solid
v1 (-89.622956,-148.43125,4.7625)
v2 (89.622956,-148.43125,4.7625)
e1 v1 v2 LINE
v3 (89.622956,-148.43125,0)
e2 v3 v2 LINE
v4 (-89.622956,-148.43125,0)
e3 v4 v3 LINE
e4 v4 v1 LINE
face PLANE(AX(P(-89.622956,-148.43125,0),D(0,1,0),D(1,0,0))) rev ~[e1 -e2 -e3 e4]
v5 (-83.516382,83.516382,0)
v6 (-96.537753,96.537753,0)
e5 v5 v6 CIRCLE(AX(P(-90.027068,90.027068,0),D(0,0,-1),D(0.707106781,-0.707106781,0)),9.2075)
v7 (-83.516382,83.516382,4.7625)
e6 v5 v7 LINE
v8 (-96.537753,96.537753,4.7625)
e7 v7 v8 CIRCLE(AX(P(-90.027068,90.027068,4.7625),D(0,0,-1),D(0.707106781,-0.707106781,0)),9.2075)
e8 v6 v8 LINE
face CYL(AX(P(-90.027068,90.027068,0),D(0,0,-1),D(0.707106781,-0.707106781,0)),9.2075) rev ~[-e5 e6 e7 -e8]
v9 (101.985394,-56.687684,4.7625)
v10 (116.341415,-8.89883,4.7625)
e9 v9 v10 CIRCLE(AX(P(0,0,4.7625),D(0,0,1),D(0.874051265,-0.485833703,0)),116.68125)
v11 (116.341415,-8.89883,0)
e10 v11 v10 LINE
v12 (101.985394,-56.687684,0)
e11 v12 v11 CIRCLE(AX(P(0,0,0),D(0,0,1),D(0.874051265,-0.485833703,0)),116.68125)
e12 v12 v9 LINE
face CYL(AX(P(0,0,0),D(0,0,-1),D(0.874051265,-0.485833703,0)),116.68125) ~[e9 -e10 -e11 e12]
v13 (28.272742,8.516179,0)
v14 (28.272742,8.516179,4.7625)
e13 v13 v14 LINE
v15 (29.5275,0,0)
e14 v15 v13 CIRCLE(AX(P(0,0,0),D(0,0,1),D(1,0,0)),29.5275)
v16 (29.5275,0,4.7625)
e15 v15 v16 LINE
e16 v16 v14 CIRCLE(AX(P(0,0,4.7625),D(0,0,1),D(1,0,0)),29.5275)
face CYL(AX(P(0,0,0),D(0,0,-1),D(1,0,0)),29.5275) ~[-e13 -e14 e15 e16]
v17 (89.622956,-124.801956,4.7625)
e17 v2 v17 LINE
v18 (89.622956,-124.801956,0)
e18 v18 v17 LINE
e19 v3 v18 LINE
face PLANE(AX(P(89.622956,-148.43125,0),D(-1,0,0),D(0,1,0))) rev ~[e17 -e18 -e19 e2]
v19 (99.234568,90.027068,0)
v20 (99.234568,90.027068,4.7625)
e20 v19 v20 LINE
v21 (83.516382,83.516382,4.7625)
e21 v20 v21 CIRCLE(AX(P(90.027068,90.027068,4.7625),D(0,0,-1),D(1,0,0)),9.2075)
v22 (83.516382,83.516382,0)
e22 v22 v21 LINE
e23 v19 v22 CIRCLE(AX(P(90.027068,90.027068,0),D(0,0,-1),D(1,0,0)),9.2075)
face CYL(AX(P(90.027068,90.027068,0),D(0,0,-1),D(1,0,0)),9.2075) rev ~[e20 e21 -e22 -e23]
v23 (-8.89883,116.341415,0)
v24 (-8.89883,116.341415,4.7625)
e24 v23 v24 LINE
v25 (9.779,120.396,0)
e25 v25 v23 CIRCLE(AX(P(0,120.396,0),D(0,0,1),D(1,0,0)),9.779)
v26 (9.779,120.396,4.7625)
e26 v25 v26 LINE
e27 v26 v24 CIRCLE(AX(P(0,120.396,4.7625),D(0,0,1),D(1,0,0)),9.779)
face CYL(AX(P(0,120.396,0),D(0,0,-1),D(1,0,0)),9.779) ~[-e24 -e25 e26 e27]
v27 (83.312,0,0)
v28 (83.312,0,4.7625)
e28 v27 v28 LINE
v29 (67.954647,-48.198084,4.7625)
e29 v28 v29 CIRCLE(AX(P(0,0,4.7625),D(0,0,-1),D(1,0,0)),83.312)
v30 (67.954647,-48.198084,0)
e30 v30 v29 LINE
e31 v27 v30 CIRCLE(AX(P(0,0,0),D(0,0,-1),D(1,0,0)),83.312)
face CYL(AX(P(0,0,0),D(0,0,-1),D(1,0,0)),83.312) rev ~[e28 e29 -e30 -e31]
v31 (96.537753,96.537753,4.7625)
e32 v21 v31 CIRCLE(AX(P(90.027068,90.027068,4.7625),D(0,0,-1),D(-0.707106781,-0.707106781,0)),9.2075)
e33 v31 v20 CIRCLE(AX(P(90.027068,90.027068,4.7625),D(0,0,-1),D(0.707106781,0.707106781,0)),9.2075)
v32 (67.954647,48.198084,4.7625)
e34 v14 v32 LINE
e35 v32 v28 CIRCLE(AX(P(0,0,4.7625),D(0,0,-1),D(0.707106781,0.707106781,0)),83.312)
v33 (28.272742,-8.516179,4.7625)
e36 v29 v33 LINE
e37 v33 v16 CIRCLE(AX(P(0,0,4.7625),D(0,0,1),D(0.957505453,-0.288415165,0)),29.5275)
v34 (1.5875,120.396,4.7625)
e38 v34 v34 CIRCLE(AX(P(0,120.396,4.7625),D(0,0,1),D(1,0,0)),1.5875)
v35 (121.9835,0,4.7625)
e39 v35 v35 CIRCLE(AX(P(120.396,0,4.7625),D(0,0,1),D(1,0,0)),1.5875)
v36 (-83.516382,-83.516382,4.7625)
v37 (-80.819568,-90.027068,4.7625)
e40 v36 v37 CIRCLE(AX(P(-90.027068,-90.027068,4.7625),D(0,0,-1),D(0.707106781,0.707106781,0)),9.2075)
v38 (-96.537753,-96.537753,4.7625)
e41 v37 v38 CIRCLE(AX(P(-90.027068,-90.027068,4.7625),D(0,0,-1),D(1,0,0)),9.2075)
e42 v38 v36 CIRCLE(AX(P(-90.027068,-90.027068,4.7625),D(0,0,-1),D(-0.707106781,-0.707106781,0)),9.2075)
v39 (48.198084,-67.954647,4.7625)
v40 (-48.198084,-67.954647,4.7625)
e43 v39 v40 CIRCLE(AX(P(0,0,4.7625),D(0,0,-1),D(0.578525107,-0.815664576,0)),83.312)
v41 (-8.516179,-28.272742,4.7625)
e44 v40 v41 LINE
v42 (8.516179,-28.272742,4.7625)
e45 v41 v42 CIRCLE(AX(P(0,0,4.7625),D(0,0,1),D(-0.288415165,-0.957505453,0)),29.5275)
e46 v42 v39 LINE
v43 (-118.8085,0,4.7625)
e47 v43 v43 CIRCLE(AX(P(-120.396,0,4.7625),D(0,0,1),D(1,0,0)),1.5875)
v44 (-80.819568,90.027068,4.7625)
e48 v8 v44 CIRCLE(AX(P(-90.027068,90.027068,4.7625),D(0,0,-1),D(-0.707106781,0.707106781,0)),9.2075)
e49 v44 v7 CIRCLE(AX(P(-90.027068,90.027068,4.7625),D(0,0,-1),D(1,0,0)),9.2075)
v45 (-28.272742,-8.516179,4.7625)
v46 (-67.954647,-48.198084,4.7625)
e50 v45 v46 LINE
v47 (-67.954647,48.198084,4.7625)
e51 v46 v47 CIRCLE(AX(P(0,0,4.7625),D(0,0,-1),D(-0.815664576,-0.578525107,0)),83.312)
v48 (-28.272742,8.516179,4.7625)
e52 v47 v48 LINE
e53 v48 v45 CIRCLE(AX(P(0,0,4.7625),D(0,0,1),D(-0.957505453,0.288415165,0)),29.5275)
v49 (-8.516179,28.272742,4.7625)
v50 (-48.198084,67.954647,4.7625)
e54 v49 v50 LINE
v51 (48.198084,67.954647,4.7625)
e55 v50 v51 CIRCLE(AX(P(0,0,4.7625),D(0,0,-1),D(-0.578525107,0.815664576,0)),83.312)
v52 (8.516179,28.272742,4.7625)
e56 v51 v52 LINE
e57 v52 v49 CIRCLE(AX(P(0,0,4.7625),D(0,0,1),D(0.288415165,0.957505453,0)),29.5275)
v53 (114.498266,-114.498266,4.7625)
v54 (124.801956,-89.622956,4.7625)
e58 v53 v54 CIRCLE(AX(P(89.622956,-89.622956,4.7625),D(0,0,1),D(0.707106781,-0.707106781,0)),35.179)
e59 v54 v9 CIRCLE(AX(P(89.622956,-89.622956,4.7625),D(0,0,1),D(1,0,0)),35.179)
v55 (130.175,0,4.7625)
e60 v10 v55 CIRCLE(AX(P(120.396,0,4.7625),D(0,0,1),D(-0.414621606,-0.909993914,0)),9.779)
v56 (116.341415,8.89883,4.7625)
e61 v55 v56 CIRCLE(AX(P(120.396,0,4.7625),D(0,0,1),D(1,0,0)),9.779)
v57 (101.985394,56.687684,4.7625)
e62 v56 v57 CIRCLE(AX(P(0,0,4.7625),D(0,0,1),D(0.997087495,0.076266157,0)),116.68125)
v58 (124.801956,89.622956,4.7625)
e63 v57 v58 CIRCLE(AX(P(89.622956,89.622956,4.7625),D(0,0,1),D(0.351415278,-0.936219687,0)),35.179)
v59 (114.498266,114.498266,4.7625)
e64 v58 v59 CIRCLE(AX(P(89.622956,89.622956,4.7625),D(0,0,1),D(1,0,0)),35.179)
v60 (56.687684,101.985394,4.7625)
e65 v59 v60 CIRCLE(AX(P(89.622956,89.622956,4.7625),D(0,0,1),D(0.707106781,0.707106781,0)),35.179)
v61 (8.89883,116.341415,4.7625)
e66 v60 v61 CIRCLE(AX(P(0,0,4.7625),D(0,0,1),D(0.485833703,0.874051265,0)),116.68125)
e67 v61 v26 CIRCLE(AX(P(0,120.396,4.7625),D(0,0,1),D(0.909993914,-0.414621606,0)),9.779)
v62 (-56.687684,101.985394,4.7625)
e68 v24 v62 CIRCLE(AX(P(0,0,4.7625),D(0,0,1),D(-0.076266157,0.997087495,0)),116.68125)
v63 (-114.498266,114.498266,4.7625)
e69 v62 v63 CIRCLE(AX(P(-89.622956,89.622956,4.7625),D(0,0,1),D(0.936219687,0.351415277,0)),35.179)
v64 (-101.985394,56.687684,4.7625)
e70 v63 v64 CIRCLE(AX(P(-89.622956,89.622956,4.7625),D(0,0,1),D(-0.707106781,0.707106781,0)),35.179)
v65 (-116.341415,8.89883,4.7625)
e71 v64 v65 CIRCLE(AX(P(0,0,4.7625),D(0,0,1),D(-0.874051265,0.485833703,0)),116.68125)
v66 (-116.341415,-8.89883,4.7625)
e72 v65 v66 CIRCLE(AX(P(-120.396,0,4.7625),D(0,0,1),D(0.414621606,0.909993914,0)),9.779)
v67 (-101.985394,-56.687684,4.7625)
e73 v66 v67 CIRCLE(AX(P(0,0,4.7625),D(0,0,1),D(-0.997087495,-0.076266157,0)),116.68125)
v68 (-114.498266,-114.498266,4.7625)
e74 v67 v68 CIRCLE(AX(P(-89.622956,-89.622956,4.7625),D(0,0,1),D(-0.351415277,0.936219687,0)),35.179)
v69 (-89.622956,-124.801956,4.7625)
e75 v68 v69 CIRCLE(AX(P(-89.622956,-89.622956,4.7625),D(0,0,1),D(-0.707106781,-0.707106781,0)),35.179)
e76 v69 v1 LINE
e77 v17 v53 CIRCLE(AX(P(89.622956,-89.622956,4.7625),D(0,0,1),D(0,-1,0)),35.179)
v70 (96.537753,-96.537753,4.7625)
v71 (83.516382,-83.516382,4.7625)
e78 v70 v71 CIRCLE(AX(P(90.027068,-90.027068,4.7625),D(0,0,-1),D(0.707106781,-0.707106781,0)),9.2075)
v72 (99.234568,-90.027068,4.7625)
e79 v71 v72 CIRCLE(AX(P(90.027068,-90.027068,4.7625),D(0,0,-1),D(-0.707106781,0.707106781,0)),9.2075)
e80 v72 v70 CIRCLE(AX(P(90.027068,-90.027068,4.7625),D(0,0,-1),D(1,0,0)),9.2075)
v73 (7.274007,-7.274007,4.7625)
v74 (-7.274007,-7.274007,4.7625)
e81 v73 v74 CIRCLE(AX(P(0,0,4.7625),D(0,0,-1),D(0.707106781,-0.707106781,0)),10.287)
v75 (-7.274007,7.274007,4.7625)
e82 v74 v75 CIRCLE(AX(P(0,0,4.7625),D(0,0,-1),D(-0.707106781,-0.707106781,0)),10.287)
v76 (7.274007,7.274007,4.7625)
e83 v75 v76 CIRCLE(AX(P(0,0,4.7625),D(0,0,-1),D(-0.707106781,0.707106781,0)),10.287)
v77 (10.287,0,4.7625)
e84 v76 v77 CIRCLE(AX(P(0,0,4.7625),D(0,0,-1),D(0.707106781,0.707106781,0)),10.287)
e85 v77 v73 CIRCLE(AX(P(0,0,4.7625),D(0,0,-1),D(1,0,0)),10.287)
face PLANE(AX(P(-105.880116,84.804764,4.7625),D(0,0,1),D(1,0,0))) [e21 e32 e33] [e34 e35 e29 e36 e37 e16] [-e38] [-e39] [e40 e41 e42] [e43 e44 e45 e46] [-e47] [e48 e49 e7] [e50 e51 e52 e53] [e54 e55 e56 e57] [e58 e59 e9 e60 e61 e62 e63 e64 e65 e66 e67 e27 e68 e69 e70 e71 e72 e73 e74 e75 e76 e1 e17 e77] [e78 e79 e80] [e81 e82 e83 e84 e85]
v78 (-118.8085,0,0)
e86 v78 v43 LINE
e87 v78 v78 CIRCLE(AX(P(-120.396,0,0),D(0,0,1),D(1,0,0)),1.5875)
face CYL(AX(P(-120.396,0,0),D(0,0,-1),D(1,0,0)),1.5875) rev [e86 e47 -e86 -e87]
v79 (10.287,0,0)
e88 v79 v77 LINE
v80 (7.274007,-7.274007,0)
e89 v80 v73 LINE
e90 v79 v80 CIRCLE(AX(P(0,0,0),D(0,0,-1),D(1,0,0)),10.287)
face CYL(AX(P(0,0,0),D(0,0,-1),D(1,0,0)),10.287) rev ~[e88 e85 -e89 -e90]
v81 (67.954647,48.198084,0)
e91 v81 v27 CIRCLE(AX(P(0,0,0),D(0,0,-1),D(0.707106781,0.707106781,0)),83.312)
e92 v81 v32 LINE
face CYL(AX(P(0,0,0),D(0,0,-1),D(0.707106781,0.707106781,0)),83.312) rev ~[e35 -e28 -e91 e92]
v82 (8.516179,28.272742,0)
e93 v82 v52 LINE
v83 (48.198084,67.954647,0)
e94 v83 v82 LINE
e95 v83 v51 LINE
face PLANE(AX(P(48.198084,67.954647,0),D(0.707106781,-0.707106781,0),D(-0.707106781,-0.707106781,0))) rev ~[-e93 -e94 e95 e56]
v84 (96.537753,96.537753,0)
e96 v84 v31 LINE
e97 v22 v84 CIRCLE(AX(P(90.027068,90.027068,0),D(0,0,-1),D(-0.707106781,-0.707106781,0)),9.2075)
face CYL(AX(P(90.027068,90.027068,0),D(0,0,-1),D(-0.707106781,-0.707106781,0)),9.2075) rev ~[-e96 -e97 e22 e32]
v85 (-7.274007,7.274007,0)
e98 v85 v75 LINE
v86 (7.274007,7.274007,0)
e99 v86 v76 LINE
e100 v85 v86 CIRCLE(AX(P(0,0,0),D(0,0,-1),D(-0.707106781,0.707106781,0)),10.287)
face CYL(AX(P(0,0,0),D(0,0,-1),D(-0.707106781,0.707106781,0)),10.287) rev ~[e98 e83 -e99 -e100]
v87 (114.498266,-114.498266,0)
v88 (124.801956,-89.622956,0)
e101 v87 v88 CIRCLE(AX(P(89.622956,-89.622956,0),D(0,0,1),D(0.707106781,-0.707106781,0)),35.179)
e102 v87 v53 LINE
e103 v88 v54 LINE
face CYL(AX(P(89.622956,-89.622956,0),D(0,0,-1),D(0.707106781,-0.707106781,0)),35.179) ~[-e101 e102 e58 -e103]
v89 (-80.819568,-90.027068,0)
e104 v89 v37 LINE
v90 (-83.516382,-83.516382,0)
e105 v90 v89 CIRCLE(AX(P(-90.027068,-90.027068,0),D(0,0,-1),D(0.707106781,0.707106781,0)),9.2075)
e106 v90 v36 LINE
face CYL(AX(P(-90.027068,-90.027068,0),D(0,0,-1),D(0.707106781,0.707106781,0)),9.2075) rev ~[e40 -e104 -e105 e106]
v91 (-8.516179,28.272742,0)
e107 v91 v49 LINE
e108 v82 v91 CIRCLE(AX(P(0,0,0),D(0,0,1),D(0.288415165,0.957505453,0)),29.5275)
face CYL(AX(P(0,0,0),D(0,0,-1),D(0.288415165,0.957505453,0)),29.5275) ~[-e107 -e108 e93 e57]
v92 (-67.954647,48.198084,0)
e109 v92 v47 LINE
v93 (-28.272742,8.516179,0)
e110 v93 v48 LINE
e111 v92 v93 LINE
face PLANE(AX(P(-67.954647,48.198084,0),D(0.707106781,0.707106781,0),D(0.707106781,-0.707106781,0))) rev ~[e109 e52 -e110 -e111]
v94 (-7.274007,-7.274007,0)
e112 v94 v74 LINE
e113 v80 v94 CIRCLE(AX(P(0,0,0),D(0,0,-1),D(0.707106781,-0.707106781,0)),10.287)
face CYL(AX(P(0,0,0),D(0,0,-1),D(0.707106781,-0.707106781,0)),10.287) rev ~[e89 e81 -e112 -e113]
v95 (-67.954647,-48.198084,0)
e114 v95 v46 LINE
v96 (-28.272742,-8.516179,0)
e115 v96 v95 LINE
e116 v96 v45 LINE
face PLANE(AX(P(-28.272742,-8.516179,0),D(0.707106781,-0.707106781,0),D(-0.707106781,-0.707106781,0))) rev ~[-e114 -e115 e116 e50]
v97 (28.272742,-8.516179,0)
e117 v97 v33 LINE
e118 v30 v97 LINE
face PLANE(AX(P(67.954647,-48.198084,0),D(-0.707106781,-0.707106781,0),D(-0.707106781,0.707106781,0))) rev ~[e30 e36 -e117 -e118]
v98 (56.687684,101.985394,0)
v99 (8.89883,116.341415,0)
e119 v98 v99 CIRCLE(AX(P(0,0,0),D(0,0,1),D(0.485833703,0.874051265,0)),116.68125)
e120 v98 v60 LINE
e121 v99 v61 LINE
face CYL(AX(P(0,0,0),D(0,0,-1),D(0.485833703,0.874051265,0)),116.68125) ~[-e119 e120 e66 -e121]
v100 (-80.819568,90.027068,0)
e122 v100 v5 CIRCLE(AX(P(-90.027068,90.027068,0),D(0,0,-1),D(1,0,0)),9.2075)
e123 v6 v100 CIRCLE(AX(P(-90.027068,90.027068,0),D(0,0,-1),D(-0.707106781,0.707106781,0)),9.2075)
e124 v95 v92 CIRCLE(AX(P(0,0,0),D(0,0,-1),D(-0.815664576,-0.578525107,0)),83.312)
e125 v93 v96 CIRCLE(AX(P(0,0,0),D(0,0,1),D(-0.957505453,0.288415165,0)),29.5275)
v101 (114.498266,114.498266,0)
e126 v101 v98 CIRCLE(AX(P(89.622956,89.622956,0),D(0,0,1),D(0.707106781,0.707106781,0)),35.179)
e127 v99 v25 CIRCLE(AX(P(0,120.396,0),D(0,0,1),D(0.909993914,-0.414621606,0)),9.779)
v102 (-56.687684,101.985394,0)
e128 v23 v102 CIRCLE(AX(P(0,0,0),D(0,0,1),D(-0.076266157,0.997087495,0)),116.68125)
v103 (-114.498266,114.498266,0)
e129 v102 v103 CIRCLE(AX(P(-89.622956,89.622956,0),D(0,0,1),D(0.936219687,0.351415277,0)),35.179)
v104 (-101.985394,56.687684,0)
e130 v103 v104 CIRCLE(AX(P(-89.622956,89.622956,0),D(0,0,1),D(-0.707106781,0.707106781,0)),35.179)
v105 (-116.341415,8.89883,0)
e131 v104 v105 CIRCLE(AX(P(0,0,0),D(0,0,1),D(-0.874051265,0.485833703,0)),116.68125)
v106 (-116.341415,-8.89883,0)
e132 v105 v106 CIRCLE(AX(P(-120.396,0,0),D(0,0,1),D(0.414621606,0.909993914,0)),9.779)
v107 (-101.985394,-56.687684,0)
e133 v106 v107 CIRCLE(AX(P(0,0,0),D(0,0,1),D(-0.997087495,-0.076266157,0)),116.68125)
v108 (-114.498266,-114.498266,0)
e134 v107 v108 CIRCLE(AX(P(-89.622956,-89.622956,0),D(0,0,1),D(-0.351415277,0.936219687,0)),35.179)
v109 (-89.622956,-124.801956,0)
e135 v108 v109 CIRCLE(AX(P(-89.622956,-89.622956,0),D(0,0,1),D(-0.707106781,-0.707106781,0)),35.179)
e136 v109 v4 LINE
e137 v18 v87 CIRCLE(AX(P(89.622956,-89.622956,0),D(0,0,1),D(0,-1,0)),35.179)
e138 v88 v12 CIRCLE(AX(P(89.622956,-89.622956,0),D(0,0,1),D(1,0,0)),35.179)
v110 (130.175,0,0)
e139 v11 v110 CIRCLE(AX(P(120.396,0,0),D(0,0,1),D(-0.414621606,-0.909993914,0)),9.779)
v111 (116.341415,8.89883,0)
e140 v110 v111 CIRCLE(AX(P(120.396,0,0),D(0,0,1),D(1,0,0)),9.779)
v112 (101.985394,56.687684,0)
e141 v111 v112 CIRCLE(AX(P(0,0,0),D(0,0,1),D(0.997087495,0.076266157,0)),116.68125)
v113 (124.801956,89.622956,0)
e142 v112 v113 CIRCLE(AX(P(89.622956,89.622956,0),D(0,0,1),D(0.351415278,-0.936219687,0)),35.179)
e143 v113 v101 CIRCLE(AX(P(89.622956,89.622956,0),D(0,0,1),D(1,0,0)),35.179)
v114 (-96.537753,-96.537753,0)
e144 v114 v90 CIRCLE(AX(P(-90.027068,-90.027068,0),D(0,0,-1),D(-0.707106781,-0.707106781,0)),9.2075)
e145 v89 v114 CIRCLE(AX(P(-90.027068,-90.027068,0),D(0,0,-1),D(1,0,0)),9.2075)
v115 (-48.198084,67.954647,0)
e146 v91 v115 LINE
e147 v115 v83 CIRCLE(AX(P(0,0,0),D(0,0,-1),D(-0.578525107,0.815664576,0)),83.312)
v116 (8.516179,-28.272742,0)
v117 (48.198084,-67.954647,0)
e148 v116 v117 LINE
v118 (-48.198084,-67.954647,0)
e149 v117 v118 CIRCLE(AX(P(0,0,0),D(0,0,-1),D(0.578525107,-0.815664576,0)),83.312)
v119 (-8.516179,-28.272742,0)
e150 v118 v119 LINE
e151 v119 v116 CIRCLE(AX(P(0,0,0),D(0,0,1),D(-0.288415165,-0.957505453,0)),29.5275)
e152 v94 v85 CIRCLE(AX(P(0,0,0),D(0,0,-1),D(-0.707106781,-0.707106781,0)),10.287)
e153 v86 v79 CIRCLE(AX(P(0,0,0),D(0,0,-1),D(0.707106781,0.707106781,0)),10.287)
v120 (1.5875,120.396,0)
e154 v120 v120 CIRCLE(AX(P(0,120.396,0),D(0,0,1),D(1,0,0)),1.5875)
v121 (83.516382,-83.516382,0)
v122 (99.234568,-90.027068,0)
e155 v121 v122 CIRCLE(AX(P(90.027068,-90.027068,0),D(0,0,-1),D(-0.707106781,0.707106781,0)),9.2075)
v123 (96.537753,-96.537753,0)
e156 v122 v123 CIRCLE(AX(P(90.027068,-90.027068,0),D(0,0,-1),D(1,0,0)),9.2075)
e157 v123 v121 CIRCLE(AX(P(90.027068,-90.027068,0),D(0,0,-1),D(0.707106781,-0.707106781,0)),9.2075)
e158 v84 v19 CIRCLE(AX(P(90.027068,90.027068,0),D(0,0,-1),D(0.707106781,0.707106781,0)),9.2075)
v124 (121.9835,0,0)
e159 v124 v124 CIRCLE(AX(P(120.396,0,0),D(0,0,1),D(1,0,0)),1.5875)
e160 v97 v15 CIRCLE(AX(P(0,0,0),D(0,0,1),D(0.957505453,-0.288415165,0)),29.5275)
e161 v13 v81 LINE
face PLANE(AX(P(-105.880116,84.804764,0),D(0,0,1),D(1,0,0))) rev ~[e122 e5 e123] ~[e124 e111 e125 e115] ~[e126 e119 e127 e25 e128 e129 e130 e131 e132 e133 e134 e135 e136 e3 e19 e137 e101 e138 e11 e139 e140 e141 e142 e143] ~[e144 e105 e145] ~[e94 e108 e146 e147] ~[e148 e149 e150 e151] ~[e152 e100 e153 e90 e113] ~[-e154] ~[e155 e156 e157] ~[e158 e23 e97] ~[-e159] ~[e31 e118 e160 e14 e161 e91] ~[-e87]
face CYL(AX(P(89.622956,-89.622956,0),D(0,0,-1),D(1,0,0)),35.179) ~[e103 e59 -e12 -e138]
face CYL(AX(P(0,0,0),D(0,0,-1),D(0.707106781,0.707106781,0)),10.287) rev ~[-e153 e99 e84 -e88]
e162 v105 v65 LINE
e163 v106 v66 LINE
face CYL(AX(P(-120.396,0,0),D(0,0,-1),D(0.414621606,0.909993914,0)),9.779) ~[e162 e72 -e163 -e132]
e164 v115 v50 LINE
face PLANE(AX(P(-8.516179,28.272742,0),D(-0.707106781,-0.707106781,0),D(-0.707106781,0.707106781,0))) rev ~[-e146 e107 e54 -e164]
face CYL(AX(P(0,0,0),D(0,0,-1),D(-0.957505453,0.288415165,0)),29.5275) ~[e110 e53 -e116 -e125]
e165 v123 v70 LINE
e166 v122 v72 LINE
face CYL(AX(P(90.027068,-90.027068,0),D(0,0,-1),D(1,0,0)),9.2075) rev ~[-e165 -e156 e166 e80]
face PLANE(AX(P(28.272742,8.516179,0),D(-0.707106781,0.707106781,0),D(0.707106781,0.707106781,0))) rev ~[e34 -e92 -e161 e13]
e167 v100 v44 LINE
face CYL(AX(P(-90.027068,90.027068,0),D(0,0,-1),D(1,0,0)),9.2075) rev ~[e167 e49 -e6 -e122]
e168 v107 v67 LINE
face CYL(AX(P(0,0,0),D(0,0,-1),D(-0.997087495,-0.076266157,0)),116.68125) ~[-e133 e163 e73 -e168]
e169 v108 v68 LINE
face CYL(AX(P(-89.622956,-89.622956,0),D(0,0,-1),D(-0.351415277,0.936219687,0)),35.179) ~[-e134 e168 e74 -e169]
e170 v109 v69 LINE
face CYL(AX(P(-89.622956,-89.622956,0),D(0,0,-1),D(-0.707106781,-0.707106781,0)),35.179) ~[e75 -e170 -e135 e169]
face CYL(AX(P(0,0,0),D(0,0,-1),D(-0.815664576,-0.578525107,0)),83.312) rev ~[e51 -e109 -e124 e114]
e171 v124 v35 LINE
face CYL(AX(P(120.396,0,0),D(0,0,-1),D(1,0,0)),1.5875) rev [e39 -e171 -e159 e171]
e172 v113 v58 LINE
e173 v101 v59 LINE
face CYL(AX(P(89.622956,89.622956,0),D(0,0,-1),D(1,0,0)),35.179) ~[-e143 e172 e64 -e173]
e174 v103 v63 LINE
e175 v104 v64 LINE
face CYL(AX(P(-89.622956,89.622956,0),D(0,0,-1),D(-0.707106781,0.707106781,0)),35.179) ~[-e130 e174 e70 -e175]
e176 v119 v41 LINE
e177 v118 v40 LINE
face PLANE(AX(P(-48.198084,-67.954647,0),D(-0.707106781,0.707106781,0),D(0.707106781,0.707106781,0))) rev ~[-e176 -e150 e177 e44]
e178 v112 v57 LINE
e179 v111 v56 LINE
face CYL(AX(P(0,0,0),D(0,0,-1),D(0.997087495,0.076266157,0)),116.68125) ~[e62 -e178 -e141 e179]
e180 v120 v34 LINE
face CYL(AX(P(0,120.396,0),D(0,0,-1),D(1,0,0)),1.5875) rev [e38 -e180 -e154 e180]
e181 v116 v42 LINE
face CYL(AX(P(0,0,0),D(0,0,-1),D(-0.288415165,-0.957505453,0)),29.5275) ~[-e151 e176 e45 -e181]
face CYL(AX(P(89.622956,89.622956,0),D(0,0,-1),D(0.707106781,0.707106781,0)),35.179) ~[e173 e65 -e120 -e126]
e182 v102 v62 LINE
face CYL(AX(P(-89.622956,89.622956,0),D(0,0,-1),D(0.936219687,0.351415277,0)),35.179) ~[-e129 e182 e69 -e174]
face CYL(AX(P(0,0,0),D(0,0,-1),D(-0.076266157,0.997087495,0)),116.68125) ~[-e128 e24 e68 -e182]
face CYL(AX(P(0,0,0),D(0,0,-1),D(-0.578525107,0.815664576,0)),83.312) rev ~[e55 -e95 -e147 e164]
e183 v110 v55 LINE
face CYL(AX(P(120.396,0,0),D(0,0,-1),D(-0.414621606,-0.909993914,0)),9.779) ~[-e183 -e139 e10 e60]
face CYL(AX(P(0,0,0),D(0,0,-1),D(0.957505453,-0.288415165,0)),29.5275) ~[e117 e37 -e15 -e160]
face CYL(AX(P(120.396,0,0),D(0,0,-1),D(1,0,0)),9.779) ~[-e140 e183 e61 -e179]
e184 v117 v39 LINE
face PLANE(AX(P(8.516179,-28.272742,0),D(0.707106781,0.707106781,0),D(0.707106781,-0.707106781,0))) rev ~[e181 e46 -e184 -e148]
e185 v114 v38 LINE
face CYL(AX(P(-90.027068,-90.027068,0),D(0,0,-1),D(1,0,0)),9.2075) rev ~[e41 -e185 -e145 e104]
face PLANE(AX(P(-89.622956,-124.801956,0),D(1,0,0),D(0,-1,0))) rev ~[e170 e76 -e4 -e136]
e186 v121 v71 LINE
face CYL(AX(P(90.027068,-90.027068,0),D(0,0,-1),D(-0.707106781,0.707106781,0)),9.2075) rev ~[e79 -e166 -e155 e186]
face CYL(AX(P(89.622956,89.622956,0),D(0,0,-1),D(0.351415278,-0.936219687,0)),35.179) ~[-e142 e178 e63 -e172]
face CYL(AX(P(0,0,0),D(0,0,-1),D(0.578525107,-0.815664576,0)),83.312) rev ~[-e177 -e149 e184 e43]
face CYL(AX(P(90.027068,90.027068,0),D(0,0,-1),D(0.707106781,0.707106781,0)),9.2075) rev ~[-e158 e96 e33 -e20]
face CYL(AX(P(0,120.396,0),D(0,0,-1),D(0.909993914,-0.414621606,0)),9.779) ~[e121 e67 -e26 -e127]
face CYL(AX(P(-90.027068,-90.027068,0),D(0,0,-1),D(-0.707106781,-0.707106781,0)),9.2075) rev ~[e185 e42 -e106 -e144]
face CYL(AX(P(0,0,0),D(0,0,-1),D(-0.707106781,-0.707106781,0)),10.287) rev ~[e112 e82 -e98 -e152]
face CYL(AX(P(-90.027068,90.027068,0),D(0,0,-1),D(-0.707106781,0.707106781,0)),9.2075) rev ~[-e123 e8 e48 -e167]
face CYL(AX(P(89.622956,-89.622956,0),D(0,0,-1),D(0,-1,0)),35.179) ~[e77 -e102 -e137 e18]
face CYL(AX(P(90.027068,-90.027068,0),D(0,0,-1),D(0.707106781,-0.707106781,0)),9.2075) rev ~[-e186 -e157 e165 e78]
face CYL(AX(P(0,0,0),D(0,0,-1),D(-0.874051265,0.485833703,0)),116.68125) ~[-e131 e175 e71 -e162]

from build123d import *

# Parameters (mm, degrees)
F0_R     = 1.5875
F1_DEPTH = 4.7625


# Not quite as in the source:
# - a length typed as a fraction of an inch, garbled in the dataset ("3 / 203.2 mm" for 3/8 in), is restored


with BuildPart() as f1:
    # F0 (on Top) → F1 (new body)
    with BuildSketch(Plane.XY):
        with BuildLine():
            ThreePointArc((-101.9853941355, 56.6876837116), (-93.1446500572, 70.2750899486), (-82.5061031123, 82.5061031123))
            Line((-82.5061031123, 82.5061031123), (-83.5163819259, 83.5163819259))
            ThreePointArc((-83.5163819259, 83.5163819259), (-96.5377533015, 83.5163819259), (-96.5377533015, 96.5377533015))
            Line((-96.5377533015, 96.5377533015), (-114.4982655436, 114.4982655436))
            ThreePointArc((-114.4982655436, 114.4982655436), (-124.0057759655, 82.180930941), (-101.9853941355, 56.6876837116))
        make_face()
        with BuildLine():
            ThreePointArc((-82.5061031123, 82.5061031123), (-70.2750899486, 93.1446500572), (-56.6876837116, 101.9853941355))
            ThreePointArc((-56.6876837116, 101.9853941355), (-82.180930941, 124.0057759655), (-114.4982655436, 114.4982655436))
            Line((-114.4982655436, 114.4982655436), (-96.5377533015, 96.5377533015))
            ThreePointArc((-96.5377533015, 96.5377533015), (-86.5035099102, 98.5336884093), (-80.8195676137, 90.0270676137))
            ThreePointArc((-80.8195676137, 90.0270676137), (-81.5204468181, 86.5035099102), (-83.5163819259, 83.5163819259))
            Line((-83.5163819259, 83.5163819259), (-82.5061031123, 82.5061031123))
        make_face()
        with BuildLine():
            ThreePointArc((-54.4439560883, 89.6229560883), (-55.0094328066, 95.9051568993), (-56.6876837116, 101.9853941355))
            ThreePointArc((-56.6876837116, 101.9853941355), (-70.2750899486, 93.1446500572), (-82.5061031123, 82.5061031123))
            Line((-82.5061031123, 82.5061031123), (-64.7476466329, 64.7476466329))
            ThreePointArc((-64.7476466329, 64.7476466329), (-57.1217980141, 76.1605356211), (-54.4439560883, 89.6229560883))
        make_face()
        with BuildLine():
            Line((-64.7476466329, 64.7476466329), (-82.5061031123, 82.5061031123))
            ThreePointArc((-82.5061031123, 82.5061031123), (-93.1446500572, 70.2750899486), (-101.9853941355, 56.6876837116))
            ThreePointArc((-101.9853941355, 56.6876837116), (-82.180930941, 55.2401362111), (-64.7476466329, 64.7476466329))
        make_face()
        with BuildLine():
            ThreePointArc((-67.954647167, 48.1980837006), (-63.6582986892, 53.7448634941), (-58.9104801542, 58.9104801542))
            Line((-58.9104801542, 58.9104801542), (-64.7476466329, 64.7476466329))
            ThreePointArc((-64.7476466329, 64.7476466329), (-82.180930941, 55.2401362111), (-101.9853941355, 56.6876837116))
            ThreePointArc((-101.9853941355, 56.6876837116), (-111.7478973152, 33.5696521758), (-116.3414153151, 8.8988304868))
            ThreePointArc((-116.3414153151, 8.8988304868), (-112.1716877299, 5.2905130832), (-110.617, 0))
            ThreePointArc((-110.617, 0), (-112.1716877299, -5.2905130832), (-116.3414153151, -8.8988304868))
            ThreePointArc((-116.3414153151, -8.8988304868), (-111.7478973152, -33.5696521758), (-101.9853941355, -56.6876837116))
            ThreePointArc((-101.9853941355, -56.6876837116), (-82.180930941, -55.2401362111), (-64.7476466329, -64.7476466329))
            Line((-64.7476466329, -64.7476466329), (-58.9104801542, -58.9104801542))
            ThreePointArc((-58.9104801542, -58.9104801542), (-63.6582986892, -53.7448634941), (-67.954647167, -48.1980837006))
            ThreePointArc((-67.954647167, -48.1980837006), (-83.312, 0), (-67.954647167, 48.1980837006))
        make_face()
        with BuildLine():
            Line((58.9104801542, 58.9104801542), (64.7476466329, 64.7476466329))
            ThreePointArc((64.7476466329, 64.7476466329), (55.2401362111, 82.180930941), (56.6876837116, 101.9853941355))
            ThreePointArc((56.6876837116, 101.9853941355), (33.5696521758, 111.7478973152), (8.8988304868, 116.3414153151))
            ThreePointArc((8.8988304868, 116.3414153151), (0, 110.617), (-8.8988304868, 116.3414153151))
            ThreePointArc((-8.8988304868, 116.3414153151), (-33.5696521758, 111.7478973152), (-56.6876837116, 101.9853941355))
            ThreePointArc((-56.6876837116, 101.9853941355), (-55.0094328066, 95.9051568993), (-54.4439560883, 89.6229560883))
            ThreePointArc((-54.4439560883, 89.6229560883), (-57.1217980141, 76.1605356211), (-64.7476466329, 64.7476466329))
            Line((-64.7476466329, 64.7476466329), (-58.9104801542, 58.9104801542))
            ThreePointArc((-58.9104801542, 58.9104801542), (-53.7448634941, 63.6582986892), (-48.1980837006, 67.954647167))
            ThreePointArc((-48.1980837006, 67.954647167), (0, 83.312), (48.1980837006, 67.954647167))
            ThreePointArc((48.1980837006, 67.954647167), (53.7448634941, 63.6582986892), (58.9104801542, 58.9104801542))
        make_face()
        with BuildLine():
            ThreePointArc((116.3414153151, -8.8988304868), (110.617, 0), (116.3414153151, 8.8988304868))
            ThreePointArc((116.3414153151, 8.8988304868), (111.7478973152, 33.5696521758), (101.9853941355, 56.6876837116))
            ThreePointArc((101.9853941355, 56.6876837116), (82.180930941, 55.2401362111), (64.7476466329, 64.7476466329))
            Line((64.7476466329, 64.7476466329), (58.9104801542, 58.9104801542))
            ThreePointArc((58.9104801542, 58.9104801542), (63.6582986892, 53.7448634941), (67.954647167, 48.1980837006))
            ThreePointArc((67.954647167, 48.1980837006), (79.3798680673, 25.2928031189), (83.312, 0))
            ThreePointArc((83.312, 0), (79.3798680673, -25.2928031189), (67.954647167, -48.1980837006))
            ThreePointArc((67.954647167, -48.1980837006), (63.6582986892, -53.7448634941), (58.9104801542, -58.9104801542))
            Line((58.9104801542, -58.9104801542), (64.7476466329, -64.7476466329))
            ThreePointArc((64.7476466329, -64.7476466329), (82.180930941, -55.2401362111), (101.9853941355, -56.6876837116))
            ThreePointArc((101.9853941355, -56.6876837116), (111.7478973152, -33.5696521758), (116.3414153151, -8.8988304868))
        make_face()
        with BuildLine():
            ThreePointArc((56.6876837116, -101.9853941355), (55.2401362111, -82.180930941), (64.7476466329, -64.7476466329))
            Line((64.7476466329, -64.7476466329), (58.9104801542, -58.9104801542))
            ThreePointArc((58.9104801542, -58.9104801542), (53.7448634941, -63.6582986892), (48.1980837006, -67.954647167))
            ThreePointArc((48.1980837006, -67.954647167), (0, -83.312), (-48.1980837006, -67.954647167))
            ThreePointArc((-48.1980837006, -67.954647167), (-53.7448634941, -63.6582986892), (-58.9104801542, -58.9104801542))
            Line((-58.9104801542, -58.9104801542), (-64.7476466329, -64.7476466329))
            ThreePointArc((-64.7476466329, -64.7476466329), (-57.1217980141, -76.1605356211), (-54.4439560883, -89.6229560883))
            ThreePointArc((-54.4439560883, -89.6229560883), (-55.0094328066, -95.9051568993), (-56.6876837116, -101.9853941355))
            ThreePointArc((-56.6876837116, -101.9853941355), (0, -116.68125), (56.6876837116, -101.9853941355))
        make_face()
        with BuildLine():
            ThreePointArc((-82.5061031123, -82.5061031123), (-70.2750899486, -93.1446500572), (-56.6876837116, -101.9853941355))
            ThreePointArc((-56.6876837116, -101.9853941355), (-55.0094328066, -95.9051568993), (-54.4439560883, -89.6229560883))
            ThreePointArc((-54.4439560883, -89.6229560883), (-57.1217980141, -76.1605356211), (-64.7476466329, -64.7476466329))
            Line((-64.7476466329, -64.7476466329), (-82.5061031123, -82.5061031123))
        make_face()
        with BuildLine():
            ThreePointArc((-101.9853941355, -56.6876837116), (-93.1446500572, -70.2750899486), (-82.5061031123, -82.5061031123))
            Line((-82.5061031123, -82.5061031123), (-64.7476466329, -64.7476466329))
            ThreePointArc((-64.7476466329, -64.7476466329), (-82.180930941, -55.2401362111), (-101.9853941355, -56.6876837116))
        make_face()
        with BuildLine():
            ThreePointArc((56.6876837116, -101.9853941355), (70.2750899486, -93.1446500572), (82.5061031123, -82.5061031123))
            Line((82.5061031123, -82.5061031123), (64.7476466329, -64.7476466329))
            ThreePointArc((64.7476466329, -64.7476466329), (55.2401362111, -82.180930941), (56.6876837116, -101.9853941355))
        make_face()
        with BuildLine():
            ThreePointArc((82.5061031123, -82.5061031123), (93.1446500572, -70.2750899486), (101.9853941355, -56.6876837116))
            ThreePointArc((101.9853941355, -56.6876837116), (82.180930941, -55.2401362111), (64.7476466329, -64.7476466329))
            Line((64.7476466329, -64.7476466329), (82.5061031123, -82.5061031123))
        make_face()
        with BuildLine():
            ThreePointArc((64.7476466329, 64.7476466329), (82.180930941, 55.2401362111), (101.9853941355, 56.6876837116))
            ThreePointArc((101.9853941355, 56.6876837116), (93.1446500572, 70.2750899486), (82.5061031123, 82.5061031123))
            Line((82.5061031123, 82.5061031123), (64.7476466329, 64.7476466329))
        make_face()
        with BuildLine():
            Line((64.7476466329, 64.7476466329), (82.5061031123, 82.5061031123))
            ThreePointArc((82.5061031123, 82.5061031123), (70.2750899486, 93.1446500572), (56.6876837116, 101.9853941355))
            ThreePointArc((56.6876837116, 101.9853941355), (55.2401362111, 82.180930941), (64.7476466329, 64.7476466329))
        make_face()
        with BuildLine():
            ThreePointArc((82.5061031123, 82.5061031123), (93.1446500572, 70.2750899486), (101.9853941355, 56.6876837116))
            ThreePointArc((101.9853941355, 56.6876837116), (118.5405999157, 69.5896858493), (124.8019560883, 89.6229560883))
            ThreePointArc((124.8019560883, 89.6229560883), (122.1241141625, 103.0853765554), (114.4982655436, 114.4982655436))
            Line((114.4982655436, 114.4982655436), (96.5377533015, 96.5377533015))
            ThreePointArc((96.5377533015, 96.5377533015), (98.5336884093, 93.5506253172), (99.2345676137, 90.0270676137))
            ThreePointArc((99.2345676137, 90.0270676137), (93.5506253172, 81.5204468181), (83.5163819259, 83.5163819259))
            Line((83.5163819259, 83.5163819259), (82.5061031123, 82.5061031123))
        make_face()
        with BuildLine():
            ThreePointArc((56.6876837116, 101.9853941355), (70.2750899486, 93.1446500572), (82.5061031123, 82.5061031123))
            Line((82.5061031123, 82.5061031123), (83.5163819259, 83.5163819259))
            ThreePointArc((83.5163819259, 83.5163819259), (83.5163819259, 96.5377533015), (96.5377533015, 96.5377533015))
            Line((96.5377533015, 96.5377533015), (114.4982655436, 114.4982655436))
            ThreePointArc((114.4982655436, 114.4982655436), (82.180930941, 124.0057759655), (56.6876837116, 101.9853941355))
        make_face()
        with BuildLine():
            Line((-83.5163819259, -83.5163819259), (-82.5061031123, -82.5061031123))
            ThreePointArc((-82.5061031123, -82.5061031123), (-93.1446500572, -70.2750899486), (-101.9853941355, -56.6876837116))
            ThreePointArc((-101.9853941355, -56.6876837116), (-124.0057759655, -82.180930941), (-114.4982655436, -114.4982655436))
            Line((-114.4982655436, -114.4982655436), (-96.5377533015, -96.5377533015))
            ThreePointArc((-96.5377533015, -96.5377533015), (-96.5377533015, -83.5163819259), (-83.5163819259, -83.5163819259))
        make_face()
        with BuildLine():
            ThreePointArc((-89.6229560883, -124.8019560883), (-69.5896858493, -118.5405999157), (-56.6876837116, -101.9853941355))
            ThreePointArc((-56.6876837116, -101.9853941355), (-70.2750899486, -93.1446500572), (-82.5061031123, -82.5061031123))
            Line((-82.5061031123, -82.5061031123), (-83.5163819259, -83.5163819259))
            ThreePointArc((-83.5163819259, -83.5163819259), (-81.5204468181, -86.5035099102), (-80.8195676137, -90.0270676137))
            ThreePointArc((-80.8195676137, -90.0270676137), (-86.5035099102, -98.5336884093), (-96.5377533015, -96.5377533015))
            Line((-96.5377533015, -96.5377533015), (-114.4982655436, -114.4982655436))
            ThreePointArc((-114.4982655436, -114.4982655436), (-103.0853765554, -122.1241141625), (-89.6229560883, -124.8019560883))
        make_face()
        with BuildLine():
            Line((83.5163819259, -83.5163819259), (82.5061031123, -82.5061031123))
            ThreePointArc((82.5061031123, -82.5061031123), (70.2750899486, -93.1446500572), (56.6876837116, -101.9853941355))
            ThreePointArc((56.6876837116, -101.9853941355), (69.5896858493, -118.5405999157), (89.6229560883, -124.8019560883))
            ThreePointArc((89.6229560883, -124.8019560883), (103.0853765554, -122.1241141625), (114.4982655436, -114.4982655436))
            Line((114.4982655436, -114.4982655436), (96.5377533015, -96.5377533015))
            ThreePointArc((96.5377533015, -96.5377533015), (83.5163819259, -96.5377533015), (83.5163819259, -83.5163819259))
        make_face()
        with BuildLine():
            ThreePointArc((124.8019560883, -89.6229560883), (118.5405999157, -69.5896858493), (101.9853941355, -56.6876837116))
            ThreePointArc((101.9853941355, -56.6876837116), (93.1446500572, -70.2750899486), (82.5061031123, -82.5061031123))
            Line((82.5061031123, -82.5061031123), (83.5163819259, -83.5163819259))
            ThreePointArc((83.5163819259, -83.5163819259), (93.5506253172, -81.5204468181), (99.2345676137, -90.0270676137))
            ThreePointArc((99.2345676137, -90.0270676137), (98.5336884093, -93.5506253172), (96.5377533015, -96.5377533015))
            Line((96.5377533015, -96.5377533015), (114.4982655436, -114.4982655436))
            ThreePointArc((114.4982655436, -114.4982655436), (122.1241141625, -103.0853765554), (124.8019560883, -89.6229560883))
        make_face()
        with BuildLine():
            ThreePointArc((116.3414153151, 8.8988304868), (116.5962603759, 4.4526585218), (116.68125, 0))
            ThreePointArc((116.68125, 0), (116.5962603759, -4.4526585218), (116.3414153151, -8.8988304868))
            ThreePointArc((116.3414153151, -8.8988304868), (125.6865130832, -8.2243122701), (130.175, 0))
            ThreePointArc((130.175, 0), (125.6865130832, 8.2243122701), (116.3414153151, 8.8988304868))
        make_face()
        with Locations((120.396, 0)):
            Circle(F0_R, mode=Mode.SUBTRACT)
        with BuildLine():
            ThreePointArc((116.3414153151, -8.8988304868), (116.5962603759, -4.4526585218), (116.68125, 0))
            ThreePointArc((116.68125, 0), (116.5962603759, 4.4526585218), (116.3414153151, 8.8988304868))
            ThreePointArc((116.3414153151, 8.8988304868), (110.617, 0), (116.3414153151, -8.8988304868))
        make_face()
        with BuildLine():
            ThreePointArc((-116.3414153151, 8.8988304868), (-116.68125, 0), (-116.3414153151, -8.8988304868))
            ThreePointArc((-116.3414153151, -8.8988304868), (-112.1716877299, -5.2905130832), (-110.617, 0))
            ThreePointArc((-110.617, 0), (-112.1716877299, 5.2905130832), (-116.3414153151, 8.8988304868))
        make_face()
        with BuildLine():
            ThreePointArc((-116.3414153151, 8.8988304868), (-130.175, 0), (-116.3414153151, -8.8988304868))
            ThreePointArc((-116.3414153151, -8.8988304868), (-116.68125, 0), (-116.3414153151, 8.8988304868))
        make_face()
        with Locations((-120.396, 0)):
            Circle(F0_R, mode=Mode.SUBTRACT)
        with BuildLine():
            ThreePointArc((-8.8988304868, 116.3414153151), (0, 110.617), (8.8988304868, 116.3414153151))
            ThreePointArc((8.8988304868, 116.3414153151), (0, 116.68125), (-8.8988304868, 116.3414153151))
        make_face()
        with BuildLine():
            ThreePointArc((-8.8988304868, 116.3414153151), (0, 116.68125), (8.8988304868, 116.3414153151))
            ThreePointArc((8.8988304868, 116.3414153151), (9.5564246539, 118.3214907003), (9.779, 120.396))
            ThreePointArc((9.779, 120.396), (-2.0745092997, 129.9524246539), (-8.8988304868, 116.3414153151))
        make_face()
        with Locations((0, 120.396)):
            Circle(F0_R, mode=Mode.SUBTRACT)
        with BuildLine():
            ThreePointArc((89.6229560883, -124.8019560883), (69.5896858493, -118.5405999157), (56.6876837116, -101.9853941355))
            ThreePointArc((56.6876837116, -101.9853941355), (0, -116.68125), (-56.6876837116, -101.9853941355))
            ThreePointArc((-56.6876837116, -101.9853941355), (-69.5896858493, -118.5405999157), (-89.6229560883, -124.8019560883))
            Line((-89.6229560883, -124.8019560883), (-89.6229560883, -148.43125))
            Line((-89.6229560883, -148.43125), (89.6229560883, -148.43125))
            Line((89.6229560883, -148.43125), (89.6229560883, -124.8019560883))
        make_face()
        with BuildLine():
            ThreePointArc((48.1980837006, -67.954647167), (53.7448634941, -63.6582986892), (58.9104801542, -58.9104801542))
            Line((58.9104801542, -58.9104801542), (20.8790954815, -20.8790954815))
            ThreePointArc((20.8790954815, -20.8790954815), (15.1554294108, -25.3413933245), (8.5161787951, -28.2727422614))
            Line((8.5161787951, -28.2727422614), (48.1980837006, -67.954647167))
        make_face()
        with BuildLine():
            Line((20.8790954815, -20.8790954815), (58.9104801542, -58.9104801542))
            ThreePointArc((58.9104801542, -58.9104801542), (63.6582986892, -53.7448634941), (67.954647167, -48.1980837006))
            Line((67.954647167, -48.1980837006), (28.2727422614, -8.5161787951))
            ThreePointArc((28.2727422614, -8.5161787951), (25.3413933245, -15.1554294108), (20.8790954815, -20.8790954815))
        make_face()
        with BuildLine():
            Line((9.8782817332, -9.8782817332), (20.8790954815, -20.8790954815))
            ThreePointArc((20.8790954815, -20.8790954815), (25.3413933245, -15.1554294108), (28.2727422614, -8.5161787951))
            Line((28.2727422614, -8.5161787951), (19.7565634664, 0))
            Line((19.7565634664, 0), (9.8782817332, -9.8782817332))
        make_face()
        with BuildLine():
            ThreePointArc((8.5161787951, -28.2727422614), (15.1554294108, -25.3413933245), (20.8790954815, -20.8790954815))
            Line((20.8790954815, -20.8790954815), (9.8782817332, -9.8782817332))
            Line((9.8782817332, -9.8782817332), (0, -19.7565634664))
            Line((0, -19.7565634664), (8.5161787951, -28.2727422614))
        make_face()
        with BuildLine():
            Line((-8.5161787951, -28.2727422614), (0, -19.7565634664))
            Line((0, -19.7565634664), (-9.8782817332, -9.8782817332))
            Line((-9.8782817332, -9.8782817332), (-20.8790954815, -20.8790954815))
            ThreePointArc((-20.8790954815, -20.8790954815), (-15.1554294108, -25.3413933245), (-8.5161787951, -28.2727422614))
        make_face()
        with BuildLine():
            ThreePointArc((-58.9104801542, -58.9104801542), (-53.7448634941, -63.6582986892), (-48.1980837006, -67.954647167))
            Line((-48.1980837006, -67.954647167), (-8.5161787951, -28.2727422614))
            ThreePointArc((-8.5161787951, -28.2727422614), (-15.1554294108, -25.3413933245), (-20.8790954815, -20.8790954815))
            Line((-20.8790954815, -20.8790954815), (-58.9104801542, -58.9104801542))
        make_face()
        with BuildLine():
            ThreePointArc((-67.954647167, -48.1980837006), (-63.6582986892, -53.7448634941), (-58.9104801542, -58.9104801542))
            Line((-58.9104801542, -58.9104801542), (-20.8790954815, -20.8790954815))
            ThreePointArc((-20.8790954815, -20.8790954815), (-25.3413933245, -15.1554294108), (-28.2727422614, -8.5161787951))
            Line((-28.2727422614, -8.5161787951), (-67.954647167, -48.1980837006))
        make_face()
        with BuildLine():
            ThreePointArc((-8.5161787951, -28.2727422614), (0, -29.5275), (8.5161787951, -28.2727422614))
            Line((8.5161787951, -28.2727422614), (0, -19.7565634664))
            Line((0, -19.7565634664), (-8.5161787951, -28.2727422614))
        make_face()
        with BuildLine():
            ThreePointArc((29.5275, 0), (29.2121263637, 4.3040596607), (28.2727422614, 8.5161787951))
            Line((28.2727422614, 8.5161787951), (19.7565634664, 0))
            Line((19.7565634664, 0), (28.2727422614, -8.5161787951))
            ThreePointArc((28.2727422614, -8.5161787951), (29.2121263637, -4.3040596607), (29.5275, 0))
        make_face()
        with BuildLine():
            Line((-20.8790954815, -20.8790954815), (-9.8782817332, -9.8782817332))
            Line((-9.8782817332, -9.8782817332), (-19.7565634664, 0))
            Line((-19.7565634664, 0), (-28.2727422614, -8.5161787951))
            ThreePointArc((-28.2727422614, -8.5161787951), (-25.3413933245, -15.1554294108), (-20.8790954815, -20.8790954815))
        make_face()
        with BuildLine():
            Line((-28.2727422614, -8.5161787951), (-19.7565634664, 0))
            Line((-19.7565634664, 0), (-28.2727422614, 8.5161787951))
            ThreePointArc((-28.2727422614, 8.5161787951), (-29.5275, 0), (-28.2727422614, -8.5161787951))
        make_face()
        with BuildLine():
            Line((-19.7565634664, 0), (-9.8782817332, 9.8782817332))
            Line((-9.8782817332, 9.8782817332), (-20.8790954815, 20.8790954815))
            ThreePointArc((-20.8790954815, 20.8790954815), (-25.3413933245, 15.1554294108), (-28.2727422614, 8.5161787951))
            Line((-28.2727422614, 8.5161787951), (-19.7565634664, 0))
        make_face()
        with BuildLine():
            Line((-9.8782817332, 9.8782817332), (0, 19.7565634664))
            Line((0, 19.7565634664), (-8.5161787951, 28.2727422614))
            ThreePointArc((-8.5161787951, 28.2727422614), (-15.1554294108, 25.3413933245), (-20.8790954815, 20.8790954815))
            Line((-20.8790954815, 20.8790954815), (-9.8782817332, 9.8782817332))
        make_face()
        with BuildLine():
            Line((0, 19.7565634664), (8.5161787951, 28.2727422614))
            ThreePointArc((8.5161787951, 28.2727422614), (0, 29.5275), (-8.5161787951, 28.2727422614))
            Line((-8.5161787951, 28.2727422614), (0, 19.7565634664))
        make_face()
        with BuildLine():
            Line((9.8782817332, 9.8782817332), (20.8790954815, 20.8790954815))
            ThreePointArc((20.8790954815, 20.8790954815), (15.1554294108, 25.3413933245), (8.5161787951, 28.2727422614))
            Line((8.5161787951, 28.2727422614), (0, 19.7565634664))
            Line((0, 19.7565634664), (9.8782817332, 9.8782817332))
        make_face()
        with BuildLine():
            ThreePointArc((28.2727422614, 8.5161787951), (25.3413933245, 15.1554294108), (20.8790954815, 20.8790954815))
            Line((20.8790954815, 20.8790954815), (9.8782817332, 9.8782817332))
            Line((9.8782817332, 9.8782817332), (19.7565634664, 0))
            Line((19.7565634664, 0), (28.2727422614, 8.5161787951))
        make_face()
        with BuildLine():
            Line((19.7565634664, 0), (9.8782817332, 9.8782817332))
            Line((9.8782817332, 9.8782817332), (7.2740074581, 7.2740074581))
            ThreePointArc((7.2740074581, 7.2740074581), (9.5039487509, 3.9366644687), (10.287, 0))
            ThreePointArc((10.287, 0), (9.5039487509, -3.9366644687), (7.2740074581, -7.2740074581))
            Line((7.2740074581, -7.2740074581), (9.8782817332, -9.8782817332))
            Line((9.8782817332, -9.8782817332), (19.7565634664, 0))
        make_face()
        with BuildLine():
            Line((0, -19.7565634664), (9.8782817332, -9.8782817332))
            Line((9.8782817332, -9.8782817332), (7.2740074581, -7.2740074581))
            ThreePointArc((7.2740074581, -7.2740074581), (0, -10.287), (-7.2740074581, -7.2740074581))
            Line((-7.2740074581, -7.2740074581), (-9.8782817332, -9.8782817332))
            Line((-9.8782817332, -9.8782817332), (0, -19.7565634664))
        make_face()
        with BuildLine():
            ThreePointArc((-7.2740074581, -7.2740074581), (-10.287, 0), (-7.2740074581, 7.2740074581))
            Line((-7.2740074581, 7.2740074581), (-9.8782817332, 9.8782817332))
            Line((-9.8782817332, 9.8782817332), (-19.7565634664, 0))
            Line((-19.7565634664, 0), (-9.8782817332, -9.8782817332))
            Line((-9.8782817332, -9.8782817332), (-7.2740074581, -7.2740074581))
        make_face()
        with BuildLine():
            Line((7.2740074581, 7.2740074581), (9.8782817332, 9.8782817332))
            Line((9.8782817332, 9.8782817332), (0, 19.7565634664))
            Line((0, 19.7565634664), (-9.8782817332, 9.8782817332))
            Line((-9.8782817332, 9.8782817332), (-7.2740074581, 7.2740074581))
            ThreePointArc((-7.2740074581, 7.2740074581), (0, 10.287), (7.2740074581, 7.2740074581))
        make_face()
        with BuildLine():
            ThreePointArc((67.954647167, 48.1980837006), (63.6582986892, 53.7448634941), (58.9104801542, 58.9104801542))
            Line((58.9104801542, 58.9104801542), (20.8790954815, 20.8790954815))
            ThreePointArc((20.8790954815, 20.8790954815), (25.3413933245, 15.1554294108), (28.2727422614, 8.5161787951))
            Line((28.2727422614, 8.5161787951), (67.954647167, 48.1980837006))
        make_face()
        with BuildLine():
            Line((20.8790954815, 20.8790954815), (58.9104801542, 58.9104801542))
            ThreePointArc((58.9104801542, 58.9104801542), (53.7448634941, 63.6582986892), (48.1980837006, 67.954647167))
            Line((48.1980837006, 67.954647167), (8.5161787951, 28.2727422614))
            ThreePointArc((8.5161787951, 28.2727422614), (15.1554294108, 25.3413933245), (20.8790954815, 20.8790954815))
        make_face()
        with BuildLine():
            Line((-8.5161787951, 28.2727422614), (-48.1980837006, 67.954647167))
            ThreePointArc((-48.1980837006, 67.954647167), (-53.7448634941, 63.6582986892), (-58.9104801542, 58.9104801542))
            Line((-58.9104801542, 58.9104801542), (-20.8790954815, 20.8790954815))
            ThreePointArc((-20.8790954815, 20.8790954815), (-15.1554294108, 25.3413933245), (-8.5161787951, 28.2727422614))
        make_face()
        with BuildLine():
            Line((-20.8790954815, 20.8790954815), (-58.9104801542, 58.9104801542))
            ThreePointArc((-58.9104801542, 58.9104801542), (-63.6582986892, 53.7448634941), (-67.954647167, 48.1980837006))
            Line((-67.954647167, 48.1980837006), (-28.2727422614, 8.5161787951))
            ThreePointArc((-28.2727422614, 8.5161787951), (-25.3413933245, 15.1554294108), (-20.8790954815, 20.8790954815))
        make_face()
    extrude(amount=F1_DEPTH)


solid = f1.part
